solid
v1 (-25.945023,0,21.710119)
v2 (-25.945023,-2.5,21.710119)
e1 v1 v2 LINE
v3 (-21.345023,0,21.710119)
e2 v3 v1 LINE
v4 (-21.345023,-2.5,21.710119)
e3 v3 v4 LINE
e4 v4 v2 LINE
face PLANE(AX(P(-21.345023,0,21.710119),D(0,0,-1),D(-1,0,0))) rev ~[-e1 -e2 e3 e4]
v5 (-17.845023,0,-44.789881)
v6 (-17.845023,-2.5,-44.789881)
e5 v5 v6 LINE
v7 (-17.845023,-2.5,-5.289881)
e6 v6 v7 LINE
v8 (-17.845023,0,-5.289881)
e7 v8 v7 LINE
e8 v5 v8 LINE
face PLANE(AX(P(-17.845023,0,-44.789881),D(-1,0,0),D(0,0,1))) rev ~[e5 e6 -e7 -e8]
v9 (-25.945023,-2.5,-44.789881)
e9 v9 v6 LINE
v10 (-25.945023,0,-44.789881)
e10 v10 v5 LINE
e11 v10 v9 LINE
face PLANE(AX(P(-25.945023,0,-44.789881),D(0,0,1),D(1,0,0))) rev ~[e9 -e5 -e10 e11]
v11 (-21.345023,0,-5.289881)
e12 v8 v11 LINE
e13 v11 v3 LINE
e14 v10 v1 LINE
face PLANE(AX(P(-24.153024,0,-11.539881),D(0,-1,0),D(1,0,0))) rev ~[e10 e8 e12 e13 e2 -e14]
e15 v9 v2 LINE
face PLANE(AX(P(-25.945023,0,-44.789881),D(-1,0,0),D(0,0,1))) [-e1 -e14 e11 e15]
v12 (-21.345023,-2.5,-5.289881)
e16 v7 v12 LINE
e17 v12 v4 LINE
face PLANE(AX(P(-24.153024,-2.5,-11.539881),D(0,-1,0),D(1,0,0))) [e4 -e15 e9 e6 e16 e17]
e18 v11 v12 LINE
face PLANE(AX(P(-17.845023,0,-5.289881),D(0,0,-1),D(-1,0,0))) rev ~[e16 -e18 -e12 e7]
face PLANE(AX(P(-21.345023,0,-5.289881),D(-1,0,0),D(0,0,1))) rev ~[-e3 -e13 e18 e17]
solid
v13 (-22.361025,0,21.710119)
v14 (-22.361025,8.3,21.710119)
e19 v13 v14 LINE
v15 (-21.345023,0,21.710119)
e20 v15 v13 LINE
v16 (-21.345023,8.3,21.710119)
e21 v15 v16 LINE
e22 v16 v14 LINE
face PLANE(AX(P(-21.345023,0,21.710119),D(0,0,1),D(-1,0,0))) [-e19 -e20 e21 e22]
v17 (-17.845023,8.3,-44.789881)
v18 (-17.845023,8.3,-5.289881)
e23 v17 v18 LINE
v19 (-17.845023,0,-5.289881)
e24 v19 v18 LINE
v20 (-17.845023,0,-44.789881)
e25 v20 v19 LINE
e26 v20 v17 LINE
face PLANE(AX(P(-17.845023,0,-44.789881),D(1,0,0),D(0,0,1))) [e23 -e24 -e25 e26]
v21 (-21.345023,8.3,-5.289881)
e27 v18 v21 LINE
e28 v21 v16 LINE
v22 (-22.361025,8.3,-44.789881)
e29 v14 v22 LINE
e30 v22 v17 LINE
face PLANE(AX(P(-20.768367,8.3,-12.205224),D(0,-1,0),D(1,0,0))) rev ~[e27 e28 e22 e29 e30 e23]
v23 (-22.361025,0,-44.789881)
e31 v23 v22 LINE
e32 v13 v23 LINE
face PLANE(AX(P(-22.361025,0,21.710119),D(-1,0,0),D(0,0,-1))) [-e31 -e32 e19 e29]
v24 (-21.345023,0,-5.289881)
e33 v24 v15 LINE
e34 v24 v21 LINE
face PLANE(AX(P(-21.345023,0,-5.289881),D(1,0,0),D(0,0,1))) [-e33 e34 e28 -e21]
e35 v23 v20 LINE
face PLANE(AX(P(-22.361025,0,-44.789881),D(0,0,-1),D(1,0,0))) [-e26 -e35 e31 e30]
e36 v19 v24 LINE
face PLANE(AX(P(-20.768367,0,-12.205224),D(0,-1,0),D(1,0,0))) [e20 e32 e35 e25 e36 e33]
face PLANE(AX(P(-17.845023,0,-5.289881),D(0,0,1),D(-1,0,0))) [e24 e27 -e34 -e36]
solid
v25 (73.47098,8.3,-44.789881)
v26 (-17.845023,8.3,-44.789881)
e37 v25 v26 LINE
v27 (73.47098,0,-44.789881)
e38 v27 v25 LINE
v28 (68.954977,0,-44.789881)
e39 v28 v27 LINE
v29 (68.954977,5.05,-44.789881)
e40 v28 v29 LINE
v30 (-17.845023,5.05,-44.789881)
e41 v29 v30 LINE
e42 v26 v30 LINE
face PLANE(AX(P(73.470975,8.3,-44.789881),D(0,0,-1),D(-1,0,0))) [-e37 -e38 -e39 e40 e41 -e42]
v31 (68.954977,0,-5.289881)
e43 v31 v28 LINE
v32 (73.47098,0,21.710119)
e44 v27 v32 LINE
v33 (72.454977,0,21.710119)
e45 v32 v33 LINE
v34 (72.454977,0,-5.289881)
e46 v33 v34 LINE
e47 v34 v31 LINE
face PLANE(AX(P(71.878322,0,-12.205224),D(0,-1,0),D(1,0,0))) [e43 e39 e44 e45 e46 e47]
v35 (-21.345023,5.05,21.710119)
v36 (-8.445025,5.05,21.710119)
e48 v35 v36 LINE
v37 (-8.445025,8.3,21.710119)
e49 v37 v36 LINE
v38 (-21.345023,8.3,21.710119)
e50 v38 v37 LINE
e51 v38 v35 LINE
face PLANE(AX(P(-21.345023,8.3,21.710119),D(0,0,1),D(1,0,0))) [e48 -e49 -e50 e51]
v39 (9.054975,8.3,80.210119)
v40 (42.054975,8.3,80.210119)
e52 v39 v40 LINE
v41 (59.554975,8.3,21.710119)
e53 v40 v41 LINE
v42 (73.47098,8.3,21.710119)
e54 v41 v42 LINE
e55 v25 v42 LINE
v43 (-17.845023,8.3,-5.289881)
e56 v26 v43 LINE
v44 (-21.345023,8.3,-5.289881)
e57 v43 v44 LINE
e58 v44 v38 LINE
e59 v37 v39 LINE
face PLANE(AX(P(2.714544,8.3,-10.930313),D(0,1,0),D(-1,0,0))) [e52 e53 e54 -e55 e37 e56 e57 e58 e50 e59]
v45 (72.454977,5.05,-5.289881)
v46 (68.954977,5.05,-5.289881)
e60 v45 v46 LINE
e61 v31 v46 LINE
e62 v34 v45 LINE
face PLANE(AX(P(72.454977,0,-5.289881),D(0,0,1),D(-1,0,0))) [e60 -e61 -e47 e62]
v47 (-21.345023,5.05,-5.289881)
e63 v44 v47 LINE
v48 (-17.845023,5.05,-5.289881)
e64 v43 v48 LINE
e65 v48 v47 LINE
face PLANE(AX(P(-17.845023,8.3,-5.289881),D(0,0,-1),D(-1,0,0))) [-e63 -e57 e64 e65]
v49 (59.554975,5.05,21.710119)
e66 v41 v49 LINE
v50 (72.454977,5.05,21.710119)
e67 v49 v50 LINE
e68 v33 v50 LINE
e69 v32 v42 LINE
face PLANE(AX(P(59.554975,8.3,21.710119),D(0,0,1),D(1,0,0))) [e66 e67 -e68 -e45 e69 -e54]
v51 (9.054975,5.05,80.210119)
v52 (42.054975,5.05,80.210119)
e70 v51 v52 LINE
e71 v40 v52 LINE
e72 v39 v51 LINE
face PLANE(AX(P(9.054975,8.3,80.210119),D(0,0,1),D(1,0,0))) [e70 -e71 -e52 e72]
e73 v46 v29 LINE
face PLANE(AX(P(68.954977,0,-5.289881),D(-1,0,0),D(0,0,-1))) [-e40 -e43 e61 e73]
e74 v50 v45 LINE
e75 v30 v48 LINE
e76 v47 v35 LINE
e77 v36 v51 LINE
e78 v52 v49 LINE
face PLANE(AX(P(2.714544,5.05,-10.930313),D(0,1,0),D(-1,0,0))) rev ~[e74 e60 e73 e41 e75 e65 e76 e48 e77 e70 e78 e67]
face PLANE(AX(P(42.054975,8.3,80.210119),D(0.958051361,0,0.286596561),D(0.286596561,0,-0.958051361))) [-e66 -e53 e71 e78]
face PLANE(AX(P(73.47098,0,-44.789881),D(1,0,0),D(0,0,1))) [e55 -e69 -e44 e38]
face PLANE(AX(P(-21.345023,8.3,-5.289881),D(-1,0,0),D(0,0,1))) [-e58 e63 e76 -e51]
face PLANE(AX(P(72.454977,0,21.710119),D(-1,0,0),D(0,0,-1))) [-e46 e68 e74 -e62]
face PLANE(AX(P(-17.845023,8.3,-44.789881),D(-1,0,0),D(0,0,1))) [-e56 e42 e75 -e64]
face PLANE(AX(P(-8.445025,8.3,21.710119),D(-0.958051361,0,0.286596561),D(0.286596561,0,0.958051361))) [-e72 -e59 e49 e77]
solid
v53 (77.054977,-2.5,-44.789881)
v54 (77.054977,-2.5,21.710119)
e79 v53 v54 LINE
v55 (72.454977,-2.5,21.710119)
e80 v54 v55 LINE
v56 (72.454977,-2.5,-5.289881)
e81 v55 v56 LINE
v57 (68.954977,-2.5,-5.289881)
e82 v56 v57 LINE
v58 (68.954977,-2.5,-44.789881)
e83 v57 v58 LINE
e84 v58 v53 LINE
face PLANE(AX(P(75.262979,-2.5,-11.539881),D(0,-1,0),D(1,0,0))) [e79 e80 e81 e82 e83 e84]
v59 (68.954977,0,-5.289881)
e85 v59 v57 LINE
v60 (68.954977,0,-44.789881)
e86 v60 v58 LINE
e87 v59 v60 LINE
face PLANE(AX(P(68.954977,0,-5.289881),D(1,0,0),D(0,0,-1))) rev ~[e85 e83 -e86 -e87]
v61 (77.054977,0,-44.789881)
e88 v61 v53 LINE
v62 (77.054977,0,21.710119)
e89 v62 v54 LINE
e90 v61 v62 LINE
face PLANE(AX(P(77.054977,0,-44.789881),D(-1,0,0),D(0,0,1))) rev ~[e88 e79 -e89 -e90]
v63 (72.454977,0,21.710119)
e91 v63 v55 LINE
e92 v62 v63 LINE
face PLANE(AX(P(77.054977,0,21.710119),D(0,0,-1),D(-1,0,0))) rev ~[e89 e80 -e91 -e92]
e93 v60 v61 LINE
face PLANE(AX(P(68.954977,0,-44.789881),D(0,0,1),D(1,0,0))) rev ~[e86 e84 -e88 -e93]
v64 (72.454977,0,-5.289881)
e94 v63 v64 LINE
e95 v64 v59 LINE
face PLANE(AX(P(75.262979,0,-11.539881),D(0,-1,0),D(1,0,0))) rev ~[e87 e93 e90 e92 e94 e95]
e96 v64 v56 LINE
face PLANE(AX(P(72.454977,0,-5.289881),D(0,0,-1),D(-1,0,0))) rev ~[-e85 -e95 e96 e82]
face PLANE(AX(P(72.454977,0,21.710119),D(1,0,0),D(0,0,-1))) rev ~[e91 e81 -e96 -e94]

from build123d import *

# Parameters (mm, degrees)
F0_W     = 3.5839973688
F0_H     = 66.5
F1_DEPTH = 2.5
F2_DEPTH = 8.3
F4_DEPTH = 3.25


with BuildPart() as f1:
    # F0 (on Front) → F1 (new body)
    with BuildSketch(Plane.XZ):
        with Locations((-24.1530238986, -11.5398805141)):
            Rectangle(F0_W, F0_H)
        Polygon((-21.345022583, 21.7101194859), (-22.3610252142, 21.7101194859), (-22.3610252142, -44.7898805141), (-17.845022583, -44.7898805141), (-17.845022583, -5.2898805141), (-21.345022583, -5.2898805141), align=None)
    extrude(amount=F1_DEPTH)


with BuildPart() as f1b:
    # F0 (on Front) → F1, piece 2 (new body)
    with BuildSketch(Plane.XZ):
        with Locations((75.2629787326, -11.5398805141)):
            Rectangle(F0_W, F0_H)
        Polygon((68.954977417, -5.2898805141), (68.954977417, -44.7898805141), (73.4709800482, -44.7898805141), (73.4709800482, 21.7101194859), (72.454977417, 21.7101194859), (72.454977417, -5.2898805141), align=None)
    extrude(amount=F1_DEPTH)


with BuildPart() as f2:
    # F0 (on Front) → F2 (new body)
    with BuildSketch(Plane.XZ):
        Polygon((-21.345022583, 21.7101194859), (-22.3610252142, 21.7101194859), (-22.3610252142, -44.7898805141), (-17.845022583, -44.7898805141), (-17.845022583, -5.2898805141), (-21.345022583, -5.2898805141), align=None)
    extrude(amount=-F2_DEPTH)


with BuildPart() as f2b:
    # F0 (on Front) → F2, piece 2 (new body)
    with BuildSketch(Plane.XZ):
        Polygon((68.954977417, -5.2898805141), (68.954977417, -44.7898805141), (73.4709800482, -44.7898805141), (73.4709800482, 21.7101194859), (72.454977417, 21.7101194859), (72.454977417, -5.2898805141), align=None)
    extrude(amount=-F2_DEPTH)

    # F3 (on face) → F4 (join)
    with BuildSketch(Plane(origin=(0, 8.3, 0), x_dir=(-1, 0, 0), z_dir=(0, 1, 0))):
        Polygon((21.345022583, -5.2898805141), (21.345022583, 21.7101194859), (8.4450252142, 21.7101194859), (-25.5549747858, 21.7101194859), (-25.5549747858, -44.7898805141), (17.845022583, -44.7898805141), (17.845022583, -5.2898805141), align=None)
        Polygon((-25.5549747858, 21.7101194859), (8.4450252142, 21.7101194859), (-9.0549747858, 80.2101194859), (-25.5549747858, 80.2101194859), align=None)
        Polygon((-59.5549747858, 21.7101194859), (-25.5549747858, 21.7101194859), (-25.5549747858, 80.2101194859), (-42.0549747858, 80.2101194859), align=None)
        Polygon((-73.4709747858, -44.7898805141), (-25.5549747858, -44.7898805141), (-25.5549747858, 21.7101194859), (-59.5549747858, 21.7101194859), (-73.4709747858, 21.7101194859), align=None)
    extrude(amount=-F4_DEPTH)


solid = Compound([f1.part, f1b.part, f2.part, f2b.part])
